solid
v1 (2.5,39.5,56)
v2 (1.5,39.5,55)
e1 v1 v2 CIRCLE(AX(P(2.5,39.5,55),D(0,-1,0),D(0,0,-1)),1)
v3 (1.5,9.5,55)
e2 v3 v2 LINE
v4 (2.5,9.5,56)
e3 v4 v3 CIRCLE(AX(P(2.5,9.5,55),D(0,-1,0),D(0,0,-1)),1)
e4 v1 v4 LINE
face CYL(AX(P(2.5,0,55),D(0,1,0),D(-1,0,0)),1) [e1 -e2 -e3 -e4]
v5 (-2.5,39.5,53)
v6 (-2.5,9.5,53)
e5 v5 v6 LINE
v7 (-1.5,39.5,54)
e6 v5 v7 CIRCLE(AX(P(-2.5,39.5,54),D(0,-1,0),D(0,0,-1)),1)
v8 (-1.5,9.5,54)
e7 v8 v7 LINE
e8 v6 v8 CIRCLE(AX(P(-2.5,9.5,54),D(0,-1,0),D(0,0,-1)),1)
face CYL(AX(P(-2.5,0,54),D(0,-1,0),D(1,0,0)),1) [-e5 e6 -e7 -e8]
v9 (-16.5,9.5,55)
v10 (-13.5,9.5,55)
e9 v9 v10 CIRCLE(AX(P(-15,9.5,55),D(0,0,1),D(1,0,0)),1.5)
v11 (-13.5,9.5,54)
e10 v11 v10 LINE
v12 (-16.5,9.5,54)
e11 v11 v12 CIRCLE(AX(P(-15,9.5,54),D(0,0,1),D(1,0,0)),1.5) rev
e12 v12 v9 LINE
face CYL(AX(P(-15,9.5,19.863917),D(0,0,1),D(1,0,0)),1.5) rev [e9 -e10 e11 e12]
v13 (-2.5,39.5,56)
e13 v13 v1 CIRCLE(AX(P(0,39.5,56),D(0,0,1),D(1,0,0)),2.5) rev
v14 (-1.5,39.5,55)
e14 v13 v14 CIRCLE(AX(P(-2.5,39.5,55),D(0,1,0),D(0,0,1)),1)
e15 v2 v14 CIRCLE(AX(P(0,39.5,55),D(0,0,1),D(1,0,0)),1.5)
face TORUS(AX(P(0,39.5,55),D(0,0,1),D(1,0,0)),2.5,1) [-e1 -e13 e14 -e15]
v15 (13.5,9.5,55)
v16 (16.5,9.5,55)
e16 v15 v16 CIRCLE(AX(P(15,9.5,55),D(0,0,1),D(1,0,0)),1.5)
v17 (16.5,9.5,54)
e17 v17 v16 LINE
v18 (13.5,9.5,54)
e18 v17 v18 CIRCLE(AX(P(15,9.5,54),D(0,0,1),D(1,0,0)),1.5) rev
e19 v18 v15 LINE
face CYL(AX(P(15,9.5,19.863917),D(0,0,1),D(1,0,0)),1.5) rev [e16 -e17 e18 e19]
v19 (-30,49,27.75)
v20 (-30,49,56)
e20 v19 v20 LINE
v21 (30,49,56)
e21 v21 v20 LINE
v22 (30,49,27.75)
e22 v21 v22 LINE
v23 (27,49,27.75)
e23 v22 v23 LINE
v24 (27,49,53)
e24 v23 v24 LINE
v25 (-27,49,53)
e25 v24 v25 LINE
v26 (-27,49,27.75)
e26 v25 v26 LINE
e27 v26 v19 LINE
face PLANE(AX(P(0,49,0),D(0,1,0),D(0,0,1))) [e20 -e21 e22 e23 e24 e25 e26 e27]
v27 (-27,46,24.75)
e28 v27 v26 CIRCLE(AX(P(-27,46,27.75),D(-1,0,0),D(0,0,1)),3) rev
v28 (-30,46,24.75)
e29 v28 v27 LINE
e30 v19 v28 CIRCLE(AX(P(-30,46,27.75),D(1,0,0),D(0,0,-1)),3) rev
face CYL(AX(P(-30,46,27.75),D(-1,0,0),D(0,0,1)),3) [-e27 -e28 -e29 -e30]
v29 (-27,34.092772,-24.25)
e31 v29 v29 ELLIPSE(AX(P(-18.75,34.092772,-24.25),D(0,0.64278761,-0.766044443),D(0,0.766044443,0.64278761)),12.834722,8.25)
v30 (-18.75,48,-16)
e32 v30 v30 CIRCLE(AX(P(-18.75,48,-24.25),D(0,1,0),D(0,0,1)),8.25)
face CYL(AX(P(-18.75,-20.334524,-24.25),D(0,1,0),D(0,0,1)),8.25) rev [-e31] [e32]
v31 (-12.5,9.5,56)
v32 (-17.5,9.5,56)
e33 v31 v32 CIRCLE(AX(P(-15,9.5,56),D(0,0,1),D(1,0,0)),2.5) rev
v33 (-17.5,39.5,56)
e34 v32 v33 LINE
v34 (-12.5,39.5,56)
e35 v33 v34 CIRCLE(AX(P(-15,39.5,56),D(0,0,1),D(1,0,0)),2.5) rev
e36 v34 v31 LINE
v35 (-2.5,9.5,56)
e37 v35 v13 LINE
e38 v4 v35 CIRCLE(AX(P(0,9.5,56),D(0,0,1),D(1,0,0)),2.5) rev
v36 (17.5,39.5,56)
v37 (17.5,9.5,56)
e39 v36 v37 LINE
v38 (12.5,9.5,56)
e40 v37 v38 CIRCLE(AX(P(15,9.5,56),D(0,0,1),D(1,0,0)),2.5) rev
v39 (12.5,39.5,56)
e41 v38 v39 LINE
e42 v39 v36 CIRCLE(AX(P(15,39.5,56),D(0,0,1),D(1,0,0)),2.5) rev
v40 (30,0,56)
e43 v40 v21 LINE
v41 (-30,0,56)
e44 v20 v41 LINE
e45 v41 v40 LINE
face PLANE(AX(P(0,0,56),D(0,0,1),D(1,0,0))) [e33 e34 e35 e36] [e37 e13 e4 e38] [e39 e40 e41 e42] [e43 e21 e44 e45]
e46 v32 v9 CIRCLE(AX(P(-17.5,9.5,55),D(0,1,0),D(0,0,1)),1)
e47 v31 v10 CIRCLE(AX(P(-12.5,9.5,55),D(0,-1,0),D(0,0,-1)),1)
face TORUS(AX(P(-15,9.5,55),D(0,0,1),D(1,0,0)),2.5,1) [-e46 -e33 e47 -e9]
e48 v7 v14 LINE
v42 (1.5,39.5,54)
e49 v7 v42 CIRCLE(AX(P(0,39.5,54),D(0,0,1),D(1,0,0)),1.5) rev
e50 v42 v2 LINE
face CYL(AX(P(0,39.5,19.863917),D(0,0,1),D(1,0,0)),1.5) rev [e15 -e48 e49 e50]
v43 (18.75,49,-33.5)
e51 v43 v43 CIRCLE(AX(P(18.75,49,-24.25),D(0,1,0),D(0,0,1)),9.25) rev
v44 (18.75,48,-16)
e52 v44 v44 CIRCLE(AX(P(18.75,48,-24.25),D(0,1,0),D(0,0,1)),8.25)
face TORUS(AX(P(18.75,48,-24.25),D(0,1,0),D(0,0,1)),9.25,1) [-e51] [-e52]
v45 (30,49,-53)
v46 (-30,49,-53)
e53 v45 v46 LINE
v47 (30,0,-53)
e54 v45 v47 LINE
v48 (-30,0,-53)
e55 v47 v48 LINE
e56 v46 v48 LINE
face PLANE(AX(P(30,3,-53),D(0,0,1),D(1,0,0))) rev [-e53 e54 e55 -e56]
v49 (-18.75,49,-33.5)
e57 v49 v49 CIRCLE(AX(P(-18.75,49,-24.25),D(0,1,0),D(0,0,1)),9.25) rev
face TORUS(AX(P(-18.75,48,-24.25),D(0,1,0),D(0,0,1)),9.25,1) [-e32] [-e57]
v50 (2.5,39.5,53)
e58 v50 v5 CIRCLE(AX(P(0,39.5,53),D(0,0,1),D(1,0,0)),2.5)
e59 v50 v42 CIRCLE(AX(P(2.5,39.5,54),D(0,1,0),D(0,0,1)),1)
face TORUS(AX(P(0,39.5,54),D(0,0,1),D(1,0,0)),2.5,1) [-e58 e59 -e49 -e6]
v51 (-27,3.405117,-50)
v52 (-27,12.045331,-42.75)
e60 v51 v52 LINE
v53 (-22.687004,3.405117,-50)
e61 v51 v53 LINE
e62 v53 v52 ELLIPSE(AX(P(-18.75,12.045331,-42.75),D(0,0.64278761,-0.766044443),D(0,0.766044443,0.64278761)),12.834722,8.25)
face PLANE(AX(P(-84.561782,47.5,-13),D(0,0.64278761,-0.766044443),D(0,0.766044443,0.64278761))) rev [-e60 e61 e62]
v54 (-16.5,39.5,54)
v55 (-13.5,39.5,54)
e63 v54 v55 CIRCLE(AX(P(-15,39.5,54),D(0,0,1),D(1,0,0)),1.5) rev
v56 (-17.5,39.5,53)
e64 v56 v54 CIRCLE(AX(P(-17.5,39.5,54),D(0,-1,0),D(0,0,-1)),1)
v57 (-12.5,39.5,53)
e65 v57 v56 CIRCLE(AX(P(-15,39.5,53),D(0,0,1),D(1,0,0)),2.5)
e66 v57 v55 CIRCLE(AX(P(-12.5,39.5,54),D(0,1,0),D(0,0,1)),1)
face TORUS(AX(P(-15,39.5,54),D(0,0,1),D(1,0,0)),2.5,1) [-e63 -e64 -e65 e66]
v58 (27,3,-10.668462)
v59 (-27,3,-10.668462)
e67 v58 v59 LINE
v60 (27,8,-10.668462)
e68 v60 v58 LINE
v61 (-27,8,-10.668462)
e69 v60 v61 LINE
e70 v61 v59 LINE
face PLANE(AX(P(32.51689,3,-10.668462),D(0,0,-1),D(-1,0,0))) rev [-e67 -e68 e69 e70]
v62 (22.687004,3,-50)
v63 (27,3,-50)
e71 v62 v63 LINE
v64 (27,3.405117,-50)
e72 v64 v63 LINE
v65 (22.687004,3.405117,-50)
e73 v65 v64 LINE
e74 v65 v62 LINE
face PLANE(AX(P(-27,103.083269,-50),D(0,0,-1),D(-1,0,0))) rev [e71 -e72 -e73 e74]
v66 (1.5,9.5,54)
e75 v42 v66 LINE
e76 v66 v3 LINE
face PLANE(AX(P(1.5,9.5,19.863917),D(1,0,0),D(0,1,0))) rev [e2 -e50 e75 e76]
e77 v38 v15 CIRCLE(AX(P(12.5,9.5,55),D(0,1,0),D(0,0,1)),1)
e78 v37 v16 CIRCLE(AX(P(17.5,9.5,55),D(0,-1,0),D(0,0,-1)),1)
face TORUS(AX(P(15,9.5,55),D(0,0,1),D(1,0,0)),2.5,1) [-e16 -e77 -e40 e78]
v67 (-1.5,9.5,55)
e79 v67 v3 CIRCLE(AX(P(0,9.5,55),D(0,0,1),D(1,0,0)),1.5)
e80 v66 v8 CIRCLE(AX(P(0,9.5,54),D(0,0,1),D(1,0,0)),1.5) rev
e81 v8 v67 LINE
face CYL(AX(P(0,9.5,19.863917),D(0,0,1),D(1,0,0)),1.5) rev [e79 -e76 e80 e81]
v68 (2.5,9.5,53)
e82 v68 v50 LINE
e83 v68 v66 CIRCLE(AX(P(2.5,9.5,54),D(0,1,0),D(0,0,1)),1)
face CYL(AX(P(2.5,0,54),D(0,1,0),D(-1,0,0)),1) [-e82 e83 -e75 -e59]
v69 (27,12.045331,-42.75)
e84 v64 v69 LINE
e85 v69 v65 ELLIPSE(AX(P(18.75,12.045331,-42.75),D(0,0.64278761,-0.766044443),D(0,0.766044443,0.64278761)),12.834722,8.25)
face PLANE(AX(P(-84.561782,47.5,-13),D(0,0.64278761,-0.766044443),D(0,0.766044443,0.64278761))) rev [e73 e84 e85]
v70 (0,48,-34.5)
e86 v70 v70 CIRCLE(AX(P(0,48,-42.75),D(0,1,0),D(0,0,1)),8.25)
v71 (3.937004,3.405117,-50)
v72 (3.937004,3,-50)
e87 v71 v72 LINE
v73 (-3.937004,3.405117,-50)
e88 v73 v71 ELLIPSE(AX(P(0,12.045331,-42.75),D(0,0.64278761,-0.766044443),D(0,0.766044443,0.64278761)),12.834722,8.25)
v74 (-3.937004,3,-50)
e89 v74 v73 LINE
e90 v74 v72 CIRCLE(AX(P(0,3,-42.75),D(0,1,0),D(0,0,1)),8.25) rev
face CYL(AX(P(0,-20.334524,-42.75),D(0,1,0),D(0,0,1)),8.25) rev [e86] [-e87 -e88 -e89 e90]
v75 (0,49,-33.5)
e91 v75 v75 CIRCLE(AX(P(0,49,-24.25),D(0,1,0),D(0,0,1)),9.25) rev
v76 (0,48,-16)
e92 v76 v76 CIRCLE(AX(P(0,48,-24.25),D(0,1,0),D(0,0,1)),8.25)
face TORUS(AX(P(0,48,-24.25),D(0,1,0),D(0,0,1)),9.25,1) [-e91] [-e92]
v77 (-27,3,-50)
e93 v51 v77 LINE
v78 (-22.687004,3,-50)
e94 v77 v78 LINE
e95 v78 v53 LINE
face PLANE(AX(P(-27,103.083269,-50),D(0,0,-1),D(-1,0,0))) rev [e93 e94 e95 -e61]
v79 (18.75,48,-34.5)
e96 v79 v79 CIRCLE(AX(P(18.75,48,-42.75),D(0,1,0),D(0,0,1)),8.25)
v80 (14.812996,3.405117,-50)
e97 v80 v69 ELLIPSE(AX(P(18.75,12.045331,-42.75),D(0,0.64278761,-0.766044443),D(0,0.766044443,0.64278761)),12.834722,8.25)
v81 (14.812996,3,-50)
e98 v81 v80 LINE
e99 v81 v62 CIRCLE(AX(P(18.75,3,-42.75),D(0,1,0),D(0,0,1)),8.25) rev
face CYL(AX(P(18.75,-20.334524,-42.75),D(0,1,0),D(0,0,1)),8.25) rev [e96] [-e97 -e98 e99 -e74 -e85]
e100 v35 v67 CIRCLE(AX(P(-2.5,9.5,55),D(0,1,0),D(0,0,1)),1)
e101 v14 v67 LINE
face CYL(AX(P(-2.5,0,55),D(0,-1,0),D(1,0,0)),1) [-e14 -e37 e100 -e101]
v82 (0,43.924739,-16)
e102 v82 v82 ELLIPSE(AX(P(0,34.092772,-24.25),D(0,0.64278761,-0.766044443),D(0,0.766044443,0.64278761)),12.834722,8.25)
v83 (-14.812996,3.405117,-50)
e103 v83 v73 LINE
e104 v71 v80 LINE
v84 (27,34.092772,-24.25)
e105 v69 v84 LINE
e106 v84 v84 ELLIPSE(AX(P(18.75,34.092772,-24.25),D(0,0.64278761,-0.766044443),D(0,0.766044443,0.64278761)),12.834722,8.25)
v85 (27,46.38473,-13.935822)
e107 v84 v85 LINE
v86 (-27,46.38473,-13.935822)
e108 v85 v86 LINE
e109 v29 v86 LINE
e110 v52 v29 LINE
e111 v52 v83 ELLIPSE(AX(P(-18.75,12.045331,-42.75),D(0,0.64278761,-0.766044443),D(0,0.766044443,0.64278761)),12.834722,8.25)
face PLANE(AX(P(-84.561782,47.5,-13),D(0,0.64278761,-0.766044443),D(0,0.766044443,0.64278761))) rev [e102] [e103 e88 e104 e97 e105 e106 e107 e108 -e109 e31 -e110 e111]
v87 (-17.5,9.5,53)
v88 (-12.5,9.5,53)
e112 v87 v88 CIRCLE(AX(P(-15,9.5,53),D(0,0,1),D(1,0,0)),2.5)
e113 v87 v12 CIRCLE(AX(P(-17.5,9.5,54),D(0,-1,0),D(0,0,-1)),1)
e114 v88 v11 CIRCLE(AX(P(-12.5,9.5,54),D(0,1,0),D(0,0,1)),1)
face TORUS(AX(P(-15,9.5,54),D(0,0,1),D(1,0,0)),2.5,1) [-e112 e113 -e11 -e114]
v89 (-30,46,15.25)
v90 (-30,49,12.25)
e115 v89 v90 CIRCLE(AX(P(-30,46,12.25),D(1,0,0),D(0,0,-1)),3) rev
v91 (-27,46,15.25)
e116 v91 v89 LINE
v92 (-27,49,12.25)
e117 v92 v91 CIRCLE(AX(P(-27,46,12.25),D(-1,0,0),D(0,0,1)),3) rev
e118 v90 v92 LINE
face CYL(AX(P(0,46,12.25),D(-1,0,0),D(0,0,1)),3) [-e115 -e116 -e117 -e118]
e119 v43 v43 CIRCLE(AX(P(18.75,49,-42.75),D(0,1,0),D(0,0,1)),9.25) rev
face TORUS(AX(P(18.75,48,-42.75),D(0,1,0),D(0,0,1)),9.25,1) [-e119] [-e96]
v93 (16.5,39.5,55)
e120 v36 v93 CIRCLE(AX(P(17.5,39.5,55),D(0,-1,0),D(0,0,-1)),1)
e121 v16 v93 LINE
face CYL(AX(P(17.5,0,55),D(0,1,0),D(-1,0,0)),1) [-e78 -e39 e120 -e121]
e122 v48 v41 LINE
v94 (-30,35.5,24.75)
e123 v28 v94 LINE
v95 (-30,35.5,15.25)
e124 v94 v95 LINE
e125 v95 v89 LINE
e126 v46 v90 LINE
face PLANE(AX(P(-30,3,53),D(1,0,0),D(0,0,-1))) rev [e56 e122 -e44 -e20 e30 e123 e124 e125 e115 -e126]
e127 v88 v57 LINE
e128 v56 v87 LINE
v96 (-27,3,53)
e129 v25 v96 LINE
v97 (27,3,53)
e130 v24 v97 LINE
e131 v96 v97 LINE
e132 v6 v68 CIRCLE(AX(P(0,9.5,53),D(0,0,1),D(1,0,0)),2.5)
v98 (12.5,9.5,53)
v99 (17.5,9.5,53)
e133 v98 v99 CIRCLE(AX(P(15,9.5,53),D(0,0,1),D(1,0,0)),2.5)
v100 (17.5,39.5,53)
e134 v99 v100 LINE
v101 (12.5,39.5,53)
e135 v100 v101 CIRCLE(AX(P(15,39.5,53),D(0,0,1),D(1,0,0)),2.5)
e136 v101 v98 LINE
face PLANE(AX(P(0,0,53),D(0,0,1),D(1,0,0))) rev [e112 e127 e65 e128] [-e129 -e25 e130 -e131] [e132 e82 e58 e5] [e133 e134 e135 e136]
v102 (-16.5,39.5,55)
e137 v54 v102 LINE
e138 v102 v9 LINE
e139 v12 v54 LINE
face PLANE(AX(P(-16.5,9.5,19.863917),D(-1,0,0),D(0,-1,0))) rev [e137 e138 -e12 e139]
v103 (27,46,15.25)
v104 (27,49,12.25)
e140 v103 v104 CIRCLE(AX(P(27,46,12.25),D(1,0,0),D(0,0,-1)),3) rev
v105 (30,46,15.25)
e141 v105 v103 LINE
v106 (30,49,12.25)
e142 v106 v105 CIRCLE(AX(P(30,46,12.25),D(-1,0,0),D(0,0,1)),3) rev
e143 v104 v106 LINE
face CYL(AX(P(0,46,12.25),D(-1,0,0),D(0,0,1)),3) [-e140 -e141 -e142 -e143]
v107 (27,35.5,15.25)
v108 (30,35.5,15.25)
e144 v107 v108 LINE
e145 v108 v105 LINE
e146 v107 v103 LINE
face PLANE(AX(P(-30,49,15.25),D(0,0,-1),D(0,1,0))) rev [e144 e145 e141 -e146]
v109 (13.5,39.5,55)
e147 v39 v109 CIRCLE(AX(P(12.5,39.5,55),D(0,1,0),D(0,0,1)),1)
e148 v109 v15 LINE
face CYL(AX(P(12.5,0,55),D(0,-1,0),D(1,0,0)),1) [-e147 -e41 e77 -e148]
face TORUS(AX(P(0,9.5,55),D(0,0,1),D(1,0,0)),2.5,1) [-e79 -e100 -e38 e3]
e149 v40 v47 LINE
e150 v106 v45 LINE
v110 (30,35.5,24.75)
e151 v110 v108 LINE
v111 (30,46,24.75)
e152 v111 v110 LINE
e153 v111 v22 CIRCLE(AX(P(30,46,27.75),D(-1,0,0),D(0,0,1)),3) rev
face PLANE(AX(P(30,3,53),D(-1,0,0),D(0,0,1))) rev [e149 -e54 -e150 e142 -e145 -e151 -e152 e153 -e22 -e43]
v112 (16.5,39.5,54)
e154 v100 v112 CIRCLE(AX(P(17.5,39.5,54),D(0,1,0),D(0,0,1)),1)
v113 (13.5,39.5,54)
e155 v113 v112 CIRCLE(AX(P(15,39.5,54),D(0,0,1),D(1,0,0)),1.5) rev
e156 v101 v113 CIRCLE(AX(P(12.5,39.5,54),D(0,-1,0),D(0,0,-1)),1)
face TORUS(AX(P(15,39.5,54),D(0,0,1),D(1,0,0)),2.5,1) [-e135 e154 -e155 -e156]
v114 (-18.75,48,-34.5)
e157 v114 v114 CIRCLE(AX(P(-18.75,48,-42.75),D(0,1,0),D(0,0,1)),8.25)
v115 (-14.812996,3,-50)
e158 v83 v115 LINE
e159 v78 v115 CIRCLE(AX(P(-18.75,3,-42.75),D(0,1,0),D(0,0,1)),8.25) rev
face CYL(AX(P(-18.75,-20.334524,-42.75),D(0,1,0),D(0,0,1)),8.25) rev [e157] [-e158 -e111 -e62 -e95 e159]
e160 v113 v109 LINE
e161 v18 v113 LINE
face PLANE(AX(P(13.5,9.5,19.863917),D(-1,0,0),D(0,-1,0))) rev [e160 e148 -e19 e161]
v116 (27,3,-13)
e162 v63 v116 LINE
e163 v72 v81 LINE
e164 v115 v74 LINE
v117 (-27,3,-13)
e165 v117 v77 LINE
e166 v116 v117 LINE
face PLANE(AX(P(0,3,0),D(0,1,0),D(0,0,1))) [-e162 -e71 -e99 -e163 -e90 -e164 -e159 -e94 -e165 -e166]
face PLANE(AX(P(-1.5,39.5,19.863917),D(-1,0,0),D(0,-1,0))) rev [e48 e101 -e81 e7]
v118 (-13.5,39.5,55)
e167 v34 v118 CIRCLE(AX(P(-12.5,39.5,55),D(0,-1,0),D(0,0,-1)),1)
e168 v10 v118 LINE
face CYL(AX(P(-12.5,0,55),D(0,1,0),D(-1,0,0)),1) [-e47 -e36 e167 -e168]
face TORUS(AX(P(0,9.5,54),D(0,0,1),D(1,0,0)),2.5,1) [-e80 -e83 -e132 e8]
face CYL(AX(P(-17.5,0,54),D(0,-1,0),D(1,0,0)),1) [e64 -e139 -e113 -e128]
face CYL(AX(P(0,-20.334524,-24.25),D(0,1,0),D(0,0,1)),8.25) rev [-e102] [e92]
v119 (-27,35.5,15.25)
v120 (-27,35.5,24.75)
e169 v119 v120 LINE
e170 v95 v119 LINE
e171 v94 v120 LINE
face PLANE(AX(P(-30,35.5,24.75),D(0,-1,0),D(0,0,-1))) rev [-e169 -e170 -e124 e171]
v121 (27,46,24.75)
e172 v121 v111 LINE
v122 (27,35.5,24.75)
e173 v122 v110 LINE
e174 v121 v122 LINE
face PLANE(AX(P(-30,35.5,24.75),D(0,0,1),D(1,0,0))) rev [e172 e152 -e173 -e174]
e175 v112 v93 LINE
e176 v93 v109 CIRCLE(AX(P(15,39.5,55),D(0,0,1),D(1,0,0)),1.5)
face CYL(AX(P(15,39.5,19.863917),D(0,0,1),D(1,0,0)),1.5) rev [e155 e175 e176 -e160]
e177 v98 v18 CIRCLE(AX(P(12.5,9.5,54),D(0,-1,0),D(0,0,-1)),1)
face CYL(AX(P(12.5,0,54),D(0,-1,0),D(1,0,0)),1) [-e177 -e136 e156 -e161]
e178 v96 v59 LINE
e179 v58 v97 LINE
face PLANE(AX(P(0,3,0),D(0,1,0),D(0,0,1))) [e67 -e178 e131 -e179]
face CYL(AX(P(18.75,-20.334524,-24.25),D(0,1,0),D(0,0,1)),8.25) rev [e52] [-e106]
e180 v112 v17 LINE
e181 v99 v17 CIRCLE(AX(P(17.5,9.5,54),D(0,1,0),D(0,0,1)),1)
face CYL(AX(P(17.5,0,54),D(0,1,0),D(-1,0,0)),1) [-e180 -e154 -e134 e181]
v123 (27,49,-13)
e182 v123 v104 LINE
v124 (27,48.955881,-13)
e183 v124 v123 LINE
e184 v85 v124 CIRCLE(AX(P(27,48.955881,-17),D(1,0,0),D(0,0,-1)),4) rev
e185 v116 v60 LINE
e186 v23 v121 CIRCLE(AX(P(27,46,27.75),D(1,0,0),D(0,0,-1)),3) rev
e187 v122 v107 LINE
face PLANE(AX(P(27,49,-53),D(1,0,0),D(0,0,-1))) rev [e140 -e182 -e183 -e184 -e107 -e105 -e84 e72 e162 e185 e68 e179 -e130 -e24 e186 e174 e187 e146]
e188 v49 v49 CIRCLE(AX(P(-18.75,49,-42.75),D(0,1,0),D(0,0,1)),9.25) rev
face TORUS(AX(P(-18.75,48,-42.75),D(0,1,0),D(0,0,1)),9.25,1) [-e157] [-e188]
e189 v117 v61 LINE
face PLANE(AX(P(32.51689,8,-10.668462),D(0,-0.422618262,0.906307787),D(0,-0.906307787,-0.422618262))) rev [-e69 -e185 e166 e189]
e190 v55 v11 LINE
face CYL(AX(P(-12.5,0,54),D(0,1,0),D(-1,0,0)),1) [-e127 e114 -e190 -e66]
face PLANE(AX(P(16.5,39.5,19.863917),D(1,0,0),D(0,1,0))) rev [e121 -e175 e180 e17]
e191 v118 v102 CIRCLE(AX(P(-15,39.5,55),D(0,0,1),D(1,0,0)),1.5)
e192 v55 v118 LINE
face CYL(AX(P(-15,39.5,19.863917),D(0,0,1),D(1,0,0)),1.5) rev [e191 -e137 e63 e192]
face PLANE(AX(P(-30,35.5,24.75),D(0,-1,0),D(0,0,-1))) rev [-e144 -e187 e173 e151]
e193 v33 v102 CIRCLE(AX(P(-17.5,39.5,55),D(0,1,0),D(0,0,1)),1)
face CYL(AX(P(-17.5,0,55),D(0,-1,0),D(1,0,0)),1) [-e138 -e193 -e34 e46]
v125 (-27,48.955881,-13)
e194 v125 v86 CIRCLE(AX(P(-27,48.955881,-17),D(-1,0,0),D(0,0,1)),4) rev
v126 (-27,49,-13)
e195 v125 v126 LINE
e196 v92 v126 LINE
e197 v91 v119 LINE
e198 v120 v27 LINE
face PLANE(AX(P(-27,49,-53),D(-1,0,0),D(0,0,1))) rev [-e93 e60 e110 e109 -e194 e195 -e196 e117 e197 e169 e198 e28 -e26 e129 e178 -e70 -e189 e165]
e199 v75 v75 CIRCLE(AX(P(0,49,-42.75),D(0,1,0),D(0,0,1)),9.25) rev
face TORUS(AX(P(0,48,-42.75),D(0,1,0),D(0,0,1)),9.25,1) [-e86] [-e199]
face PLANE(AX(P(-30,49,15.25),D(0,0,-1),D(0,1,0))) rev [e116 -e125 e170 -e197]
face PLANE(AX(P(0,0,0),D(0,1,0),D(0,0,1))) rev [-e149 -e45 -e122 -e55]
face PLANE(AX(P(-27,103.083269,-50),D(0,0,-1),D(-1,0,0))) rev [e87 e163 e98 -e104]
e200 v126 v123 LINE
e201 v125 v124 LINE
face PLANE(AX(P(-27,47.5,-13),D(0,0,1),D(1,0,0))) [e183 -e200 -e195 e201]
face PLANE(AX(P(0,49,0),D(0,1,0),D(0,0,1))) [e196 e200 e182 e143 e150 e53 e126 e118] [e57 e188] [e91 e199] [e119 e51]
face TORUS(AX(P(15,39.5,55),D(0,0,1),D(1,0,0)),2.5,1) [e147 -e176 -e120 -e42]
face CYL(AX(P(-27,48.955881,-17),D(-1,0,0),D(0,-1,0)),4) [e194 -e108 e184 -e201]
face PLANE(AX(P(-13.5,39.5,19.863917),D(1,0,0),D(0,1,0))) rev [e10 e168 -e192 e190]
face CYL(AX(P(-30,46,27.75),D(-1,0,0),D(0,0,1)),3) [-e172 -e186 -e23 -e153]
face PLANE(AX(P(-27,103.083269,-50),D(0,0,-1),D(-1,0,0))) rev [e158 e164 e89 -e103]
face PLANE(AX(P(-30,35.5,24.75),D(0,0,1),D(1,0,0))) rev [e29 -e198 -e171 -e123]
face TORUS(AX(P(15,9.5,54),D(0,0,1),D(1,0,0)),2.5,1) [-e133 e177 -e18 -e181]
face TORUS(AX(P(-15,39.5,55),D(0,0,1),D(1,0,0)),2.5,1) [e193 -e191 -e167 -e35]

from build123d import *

# Parameters (mm, degrees)
BASE_PLATE_W              = 60
BASE_PLATE_H              = 106
BASE_DEPTH                = 3
SKETCH3_W                 = 3
SKETCH3_H                 = 106
BOSS_EXTRUDE2_DEPTH       = 46
SKETCH5_W                 = 54
SKETCH5_H                 = 3
BOSS_EXTRUDE3_DEPTH       = 46
SKETCH4_W                 = 54
SKETCH4_H                 = 37
BOSS_EXTRUDE4_DEPTH       = 1.5
BOSS_EXTRUDE5_DEPTH       = 54
CUT_EXTRUDE1_REACH        = 80.166
FLUXPENS_R                = 8.25
FILLET1_R                 = 1
FILLET2_R                 = 1
FILLET3_R                 = 1
FILLET4_R                 = 1
FILLET5_R                 = 1
FILLET6_R                 = 1
ROLLER_CUT_OUT_DEPTH      = 92.972822073
ROLLER_CUT_OUT_DEPTH_BACK = 92.972822073
SKETCH12_W                = 9.5
SKETCH12_H                = 13.5
SKETCH13_W                = 60
SKETCH13_H                = 49
BOSS_EXTRUDE6_DEPTH       = 3
CUT_EXTRUDE6_DEPTH        = 3
FILLET7_R                 = 1
FILLET8_R                 = 1
FILLET9_R                 = 1
FILLET10_R                = 3
FILLET11_R                = 3
FILLET12_R                = 3
FILLET13_R                = 3
FILLET14_R                = 4
FILLET15_R                = 1
FILLET16_R                = 1
FILLET17_R                = 1
TOOL_CATCHER_DEPTH        = 54


with BuildPart() as part:
    # Base Plate → Base (new body)
    with BuildSketch(Plane(origin=(0, 0, 0), x_dir=(1, 0, 0), z_dir=(0, 1, 0))):
        Rectangle(BASE_PLATE_W, BASE_PLATE_H)
    extrude(amount=BASE_DEPTH)

    # Sketch3 → Boss-Extrude2 (add)
    with BuildSketch(Plane(origin=(0, 3, 0), x_dir=(1, 0, 0), z_dir=(0, 1, 0))):
        with Locations((-28.5, 0)):
            Rectangle(SKETCH3_W, SKETCH3_H)
        with Locations((28.5, 0)):
            Rectangle(SKETCH3_W, SKETCH3_H)
    extrude(amount=BOSS_EXTRUDE2_DEPTH)

    # Sketch5 → Boss-Extrude3 (add)
    with BuildSketch(Plane(origin=(0, 3, 0), x_dir=(1, 0, 0), z_dir=(0, 1, 0))):
        with Locations((0, 51.5)):
            Rectangle(SKETCH5_W, SKETCH5_H)
    extrude(amount=BOSS_EXTRUDE3_DEPTH)

    # Sketch4 → Boss-Extrude4 (add)
    with BuildSketch(Plane(origin=(0, 49, 0), x_dir=(1, 0, 0), z_dir=(0, 1, 0))):
        with Locations((0, 31.5)):
            Rectangle(SKETCH4_W, SKETCH4_H)
    extrude(amount=-BOSS_EXTRUDE4_DEPTH)

    # Sketch7 → Boss-Extrude5 (add)
    with BuildSketch(Plane.ZY.offset(-27)):
        Polygon((-50, 47.5), (-13, 47.5), (-50, 3.405117074), align=None)
    extrude(amount=BOSS_EXTRUDE5_DEPTH)

    # Cut-Extrude1: up to this face of the body (flat: up to its plane)
    cut_extrude1_end = Plane(part.part.faces().sort_by_distance((0, 3, 1.5))[0])
    # FluxPens → Cut-Extrude1 (cut, up to the picked face)
    with BuildSketch(Plane(origin=(0, 49, 0), x_dir=(1, 0, 0), z_dir=(0, 1, 0)), mode=Mode.PRIVATE) as cut_extrude1_sk1:
        with Locations(Location((-18.75, 42.75, 0), (0, 0, 270))):
            Circle(FLUXPENS_R)
    cut_extrude1_tool1 = split(extrude(cut_extrude1_sk1.sketch, amount=-CUT_EXTRUDE1_REACH, mode=Mode.PRIVATE), bisect_by=cut_extrude1_end, keep=Keep.BOTH, mode=Mode.PRIVATE)
    # FluxPens → Cut-Extrude1 (cut, up to the picked face)
    with BuildSketch(Plane(origin=(0, 49, 0), x_dir=(1, 0, 0), z_dir=(0, 1, 0)), mode=Mode.PRIVATE) as cut_extrude1_sk2:
        with Locations(Location((-18.75, 24.25, 0), (0, 0, 270))):
            Circle(FLUXPENS_R)
    cut_extrude1_tool2 = split(extrude(cut_extrude1_sk2.sketch, amount=-CUT_EXTRUDE1_REACH, mode=Mode.PRIVATE), bisect_by=cut_extrude1_end, keep=Keep.BOTH, mode=Mode.PRIVATE)
    # FluxPens → Cut-Extrude1 (cut, up to the picked face)
    with BuildSketch(Plane(origin=(0, 49, 0), x_dir=(1, 0, 0), z_dir=(0, 1, 0)), mode=Mode.PRIVATE) as cut_extrude1_sk3:
        with Locations(Location((0, 42.75, 0), (0, 0, 270))):
            Circle(FLUXPENS_R)
    cut_extrude1_tool3 = split(extrude(cut_extrude1_sk3.sketch, amount=-CUT_EXTRUDE1_REACH, mode=Mode.PRIVATE), bisect_by=cut_extrude1_end, keep=Keep.BOTH, mode=Mode.PRIVATE)
    # FluxPens → Cut-Extrude1 (cut, up to the picked face)
    with BuildSketch(Plane(origin=(0, 49, 0), x_dir=(1, 0, 0), z_dir=(0, 1, 0)), mode=Mode.PRIVATE) as cut_extrude1_sk4:
        with Locations(Location((0, 24.25, 0), (0, 0, 270))):
            Circle(FLUXPENS_R)
    cut_extrude1_tool4 = split(extrude(cut_extrude1_sk4.sketch, amount=-CUT_EXTRUDE1_REACH, mode=Mode.PRIVATE), bisect_by=cut_extrude1_end, keep=Keep.BOTH, mode=Mode.PRIVATE)
    # FluxPens → Cut-Extrude1 (cut, up to the picked face)
    with BuildSketch(Plane(origin=(0, 49, 0), x_dir=(1, 0, 0), z_dir=(0, 1, 0)), mode=Mode.PRIVATE) as cut_extrude1_sk5:
        with Locations(Location((18.75, 24.25, 0), (0, 0, 270))):
            Circle(FLUXPENS_R)
    cut_extrude1_tool5 = split(extrude(cut_extrude1_sk5.sketch, amount=-CUT_EXTRUDE1_REACH, mode=Mode.PRIVATE), bisect_by=cut_extrude1_end, keep=Keep.BOTH, mode=Mode.PRIVATE)
    # FluxPens → Cut-Extrude1 (cut, up to the picked face)
    with BuildSketch(Plane(origin=(0, 49, 0), x_dir=(1, 0, 0), z_dir=(0, 1, 0)), mode=Mode.PRIVATE) as cut_extrude1_sk6:
        with Locations(Location((18.75, 42.75, 0), (0, 0, 270))):
            Circle(FLUXPENS_R)
    cut_extrude1_tool6 = split(extrude(cut_extrude1_sk6.sketch, amount=-CUT_EXTRUDE1_REACH, mode=Mode.PRIVATE), bisect_by=cut_extrude1_end, keep=Keep.BOTH, mode=Mode.PRIVATE)
    add(cut_extrude1_tool1.solids().sort_by(Axis((-18.75, 49, -42.75), (0, -1, 0)))[0], mode=Mode.SUBTRACT)
    add(cut_extrude1_tool2.solids().sort_by(Axis((-18.75, 49, -24.25), (0, -1, 0)))[0], mode=Mode.SUBTRACT)
    add(cut_extrude1_tool3.solids().sort_by(Axis((0, 49, -42.75), (0, -1, 0)))[0], mode=Mode.SUBTRACT)
    add(cut_extrude1_tool4.solids().sort_by(Axis((0, 49, -24.25), (0, -1, 0)))[0], mode=Mode.SUBTRACT)
    add(cut_extrude1_tool5.solids().sort_by(Axis((18.75, 49, -24.25), (0, -1, 0)))[0], mode=Mode.SUBTRACT)
    add(cut_extrude1_tool6.solids().sort_by(Axis((18.75, 49, -42.75), (0, -1, 0)))[0], mode=Mode.SUBTRACT)

    # Fillet1
    fillet1_edges = [part.edges().sort_by_distance(p)[0] for p in [
        (-18.75, 49, -51),
    ]]
    fillet(fillet1_edges, radius=FILLET1_R)

    # Fillet2
    fillet2_edges = [part.edges().sort_by_distance(p)[0] for p in [
        (0, 49, -51),
    ]]
    fillet(fillet2_edges, radius=FILLET2_R)

    # Fillet3
    fillet3_edges = [part.edges().sort_by_distance(p)[0] for p in [
        (-18.75, 49, -32.5),
    ]]
    fillet(fillet3_edges, radius=FILLET3_R - 0.0001)  # a hair under: the kernel refuses the full size

    # Fillet4
    fillet4_edges = [part.edges().sort_by_distance(p)[0] for p in [
        (0, 49, -32.5),
    ]]
    fillet(fillet4_edges, radius=FILLET4_R - 0.0001)  # a hair under: the kernel refuses the full size

    # Fillet5
    fillet5_edges = [part.edges().sort_by_distance(p)[0] for p in [
        (18.75, 49, -51),
    ]]
    fillet(fillet5_edges, radius=FILLET5_R)

    # Fillet6
    fillet6_edges = [part.edges().sort_by_distance(p)[0] for p in [
        (18.75, 49, -32.5),
    ]]
    fillet(fillet6_edges, radius=FILLET6_R - 0.0001)  # a hair under: the kernel refuses the full size

    # Sketch12 → Roller Cut Out (cut, two sides: drawn at the far end of the back side and taken through both)
    with BuildSketch(Plane(origin=(-27, 0, 0), x_dir=(0, 0, -1), z_dir=(1, 0, 0)).offset(-ROLLER_CUT_OUT_DEPTH_BACK)):
        with Locations((-20, 42.25)):
            Rectangle(SKETCH12_W, SKETCH12_H)
    extrude(amount=ROLLER_CUT_OUT_DEPTH + ROLLER_CUT_OUT_DEPTH_BACK, mode=Mode.SUBTRACT)

    # Sketch13 → Boss-Extrude6 (add)
    with BuildSketch(Plane.XY.offset(53)):
        with Locations((0, 24.5)):
            Rectangle(SKETCH13_W, SKETCH13_H)
    extrude(amount=BOSS_EXTRUDE6_DEPTH)

    # Sketch14 → Cut-Extrude6 (cut)
    with BuildSketch(Plane.XY.offset(56)):
        with BuildLine():
            Line((-16.5, 9.5), (-16.5, 39.5))
            ThreePointArc((-16.5, 39.5), (-15, 41), (-13.5, 39.5))
            Line((-13.5, 39.5), (-13.5, 9.5))
            ThreePointArc((-13.5, 9.5), (-15, 8), (-16.5, 9.5))
        make_face()
        with BuildLine():
            Line((13.5, 9.5), (13.5, 39.5))
            ThreePointArc((13.5, 39.5), (15, 41), (16.5, 39.5))
            Line((16.5, 39.5), (16.5, 9.5))
            ThreePointArc((16.5, 9.5), (15, 8), (13.5, 9.5))
        make_face()
        with BuildLine():
            Line((-1.5, 39.5), (-1.5, 9.5))
            ThreePointArc((-1.5, 9.5), (0, 8), (1.5, 9.5))
            Line((1.5, 9.5), (1.5, 39.5))
            ThreePointArc((1.5, 39.5), (0, 41), (-1.5, 39.5))
        make_face()
    extrude(amount=-CUT_EXTRUDE6_DEPTH, mode=Mode.SUBTRACT)

    # Fillet7
    fillet7_edges = [part.edges().sort_by_distance(p)[0] for p in [
        (-15, 8, 53),
        (-16.5, 24.5, 53),
        (-15, 41, 53),
        (-13.5, 24.5, 53),
    ]]
    fillet(fillet7_edges, radius=FILLET7_R)

    # Fillet8
    fillet8_edges = [part.edges().sort_by_distance(p)[0] for p in [
        (0, 41, 53),
        (1.5, 24.5, 53),
        (0, 8, 53),
        (-1.5, 24.5, 53),
    ]]
    fillet(fillet8_edges, radius=FILLET8_R)

    # Fillet9
    fillet9_edges = [part.edges().sort_by_distance(p)[0] for p in [
        (15, 8, 53),
        (13.5, 24.5, 53),
        (15, 41, 53),
        (16.5, 24.5, 53),
    ]]
    fillet(fillet9_edges, radius=FILLET9_R)

    # Fillet10
    fillet10_edges = [part.edges().sort_by_distance(p)[0] for p in [
        (-28.5, 49, 15.25),
    ]]
    fillet(fillet10_edges, radius=FILLET10_R)

    # Fillet11
    fillet11_edges = [part.edges().sort_by_distance(p)[0] for p in [
        (-28.5, 49, 24.75),
    ]]
    fillet(fillet11_edges, radius=FILLET11_R)

    # Fillet12
    fillet12_edges = [part.edges().sort_by_distance(p)[0] for p in [
        (28.5, 49, 15.25),
    ]]
    fillet(fillet12_edges, radius=FILLET12_R)

    # Fillet13
    fillet13_edges = [part.edges().sort_by_distance(p)[0] for p in [
        (28.5, 49, 24.75),
    ]]
    fillet(fillet13_edges, radius=FILLET13_R)

    # Fillet14
    fillet14_edges = [part.edges().sort_by_distance(p)[0] for p in [
        (0, 47.5, -13),
    ]]
    fillet(fillet14_edges, radius=FILLET14_R)

    # Fillet15
    fillet15_edges = [part.edges().sort_by_distance(p)[0] for p in [
        (0, 41, 56),
        (-1.5, 24.5, 56),
        (0, 8, 56),
        (1.5, 24.5, 56),
    ]]
    fillet(fillet15_edges, radius=FILLET15_R)

    # Fillet16
    fillet16_edges = [part.edges().sort_by_distance(p)[0] for p in [
        (-15, 8, 56),
        (-13.5, 24.5, 56),
        (-15, 41, 56),
        (-16.5, 24.5, 56),
    ]]
    fillet(fillet16_edges, radius=FILLET16_R)

    # Fillet17
    fillet17_edges = [part.edges().sort_by_distance(p)[0] for p in [
        (15, 8, 56),
        (16.5, 24.5, 56),
        (15, 41, 56),
        (13.5, 24.5, 56),
    ]]
    fillet(fillet17_edges, radius=FILLET17_R)

    # Sketch16 → Tool Catcher (add)
    with BuildSketch(Plane(origin=(-27, 0, 0), x_dir=(0, 0, -1), z_dir=(1, 0, 0))):
        Polygon((10.668461709, 3), (10.668461709, 8), (13, 3), align=None)
    extrude(amount=TOOL_CATCHER_DEPTH)


solid = part.part
